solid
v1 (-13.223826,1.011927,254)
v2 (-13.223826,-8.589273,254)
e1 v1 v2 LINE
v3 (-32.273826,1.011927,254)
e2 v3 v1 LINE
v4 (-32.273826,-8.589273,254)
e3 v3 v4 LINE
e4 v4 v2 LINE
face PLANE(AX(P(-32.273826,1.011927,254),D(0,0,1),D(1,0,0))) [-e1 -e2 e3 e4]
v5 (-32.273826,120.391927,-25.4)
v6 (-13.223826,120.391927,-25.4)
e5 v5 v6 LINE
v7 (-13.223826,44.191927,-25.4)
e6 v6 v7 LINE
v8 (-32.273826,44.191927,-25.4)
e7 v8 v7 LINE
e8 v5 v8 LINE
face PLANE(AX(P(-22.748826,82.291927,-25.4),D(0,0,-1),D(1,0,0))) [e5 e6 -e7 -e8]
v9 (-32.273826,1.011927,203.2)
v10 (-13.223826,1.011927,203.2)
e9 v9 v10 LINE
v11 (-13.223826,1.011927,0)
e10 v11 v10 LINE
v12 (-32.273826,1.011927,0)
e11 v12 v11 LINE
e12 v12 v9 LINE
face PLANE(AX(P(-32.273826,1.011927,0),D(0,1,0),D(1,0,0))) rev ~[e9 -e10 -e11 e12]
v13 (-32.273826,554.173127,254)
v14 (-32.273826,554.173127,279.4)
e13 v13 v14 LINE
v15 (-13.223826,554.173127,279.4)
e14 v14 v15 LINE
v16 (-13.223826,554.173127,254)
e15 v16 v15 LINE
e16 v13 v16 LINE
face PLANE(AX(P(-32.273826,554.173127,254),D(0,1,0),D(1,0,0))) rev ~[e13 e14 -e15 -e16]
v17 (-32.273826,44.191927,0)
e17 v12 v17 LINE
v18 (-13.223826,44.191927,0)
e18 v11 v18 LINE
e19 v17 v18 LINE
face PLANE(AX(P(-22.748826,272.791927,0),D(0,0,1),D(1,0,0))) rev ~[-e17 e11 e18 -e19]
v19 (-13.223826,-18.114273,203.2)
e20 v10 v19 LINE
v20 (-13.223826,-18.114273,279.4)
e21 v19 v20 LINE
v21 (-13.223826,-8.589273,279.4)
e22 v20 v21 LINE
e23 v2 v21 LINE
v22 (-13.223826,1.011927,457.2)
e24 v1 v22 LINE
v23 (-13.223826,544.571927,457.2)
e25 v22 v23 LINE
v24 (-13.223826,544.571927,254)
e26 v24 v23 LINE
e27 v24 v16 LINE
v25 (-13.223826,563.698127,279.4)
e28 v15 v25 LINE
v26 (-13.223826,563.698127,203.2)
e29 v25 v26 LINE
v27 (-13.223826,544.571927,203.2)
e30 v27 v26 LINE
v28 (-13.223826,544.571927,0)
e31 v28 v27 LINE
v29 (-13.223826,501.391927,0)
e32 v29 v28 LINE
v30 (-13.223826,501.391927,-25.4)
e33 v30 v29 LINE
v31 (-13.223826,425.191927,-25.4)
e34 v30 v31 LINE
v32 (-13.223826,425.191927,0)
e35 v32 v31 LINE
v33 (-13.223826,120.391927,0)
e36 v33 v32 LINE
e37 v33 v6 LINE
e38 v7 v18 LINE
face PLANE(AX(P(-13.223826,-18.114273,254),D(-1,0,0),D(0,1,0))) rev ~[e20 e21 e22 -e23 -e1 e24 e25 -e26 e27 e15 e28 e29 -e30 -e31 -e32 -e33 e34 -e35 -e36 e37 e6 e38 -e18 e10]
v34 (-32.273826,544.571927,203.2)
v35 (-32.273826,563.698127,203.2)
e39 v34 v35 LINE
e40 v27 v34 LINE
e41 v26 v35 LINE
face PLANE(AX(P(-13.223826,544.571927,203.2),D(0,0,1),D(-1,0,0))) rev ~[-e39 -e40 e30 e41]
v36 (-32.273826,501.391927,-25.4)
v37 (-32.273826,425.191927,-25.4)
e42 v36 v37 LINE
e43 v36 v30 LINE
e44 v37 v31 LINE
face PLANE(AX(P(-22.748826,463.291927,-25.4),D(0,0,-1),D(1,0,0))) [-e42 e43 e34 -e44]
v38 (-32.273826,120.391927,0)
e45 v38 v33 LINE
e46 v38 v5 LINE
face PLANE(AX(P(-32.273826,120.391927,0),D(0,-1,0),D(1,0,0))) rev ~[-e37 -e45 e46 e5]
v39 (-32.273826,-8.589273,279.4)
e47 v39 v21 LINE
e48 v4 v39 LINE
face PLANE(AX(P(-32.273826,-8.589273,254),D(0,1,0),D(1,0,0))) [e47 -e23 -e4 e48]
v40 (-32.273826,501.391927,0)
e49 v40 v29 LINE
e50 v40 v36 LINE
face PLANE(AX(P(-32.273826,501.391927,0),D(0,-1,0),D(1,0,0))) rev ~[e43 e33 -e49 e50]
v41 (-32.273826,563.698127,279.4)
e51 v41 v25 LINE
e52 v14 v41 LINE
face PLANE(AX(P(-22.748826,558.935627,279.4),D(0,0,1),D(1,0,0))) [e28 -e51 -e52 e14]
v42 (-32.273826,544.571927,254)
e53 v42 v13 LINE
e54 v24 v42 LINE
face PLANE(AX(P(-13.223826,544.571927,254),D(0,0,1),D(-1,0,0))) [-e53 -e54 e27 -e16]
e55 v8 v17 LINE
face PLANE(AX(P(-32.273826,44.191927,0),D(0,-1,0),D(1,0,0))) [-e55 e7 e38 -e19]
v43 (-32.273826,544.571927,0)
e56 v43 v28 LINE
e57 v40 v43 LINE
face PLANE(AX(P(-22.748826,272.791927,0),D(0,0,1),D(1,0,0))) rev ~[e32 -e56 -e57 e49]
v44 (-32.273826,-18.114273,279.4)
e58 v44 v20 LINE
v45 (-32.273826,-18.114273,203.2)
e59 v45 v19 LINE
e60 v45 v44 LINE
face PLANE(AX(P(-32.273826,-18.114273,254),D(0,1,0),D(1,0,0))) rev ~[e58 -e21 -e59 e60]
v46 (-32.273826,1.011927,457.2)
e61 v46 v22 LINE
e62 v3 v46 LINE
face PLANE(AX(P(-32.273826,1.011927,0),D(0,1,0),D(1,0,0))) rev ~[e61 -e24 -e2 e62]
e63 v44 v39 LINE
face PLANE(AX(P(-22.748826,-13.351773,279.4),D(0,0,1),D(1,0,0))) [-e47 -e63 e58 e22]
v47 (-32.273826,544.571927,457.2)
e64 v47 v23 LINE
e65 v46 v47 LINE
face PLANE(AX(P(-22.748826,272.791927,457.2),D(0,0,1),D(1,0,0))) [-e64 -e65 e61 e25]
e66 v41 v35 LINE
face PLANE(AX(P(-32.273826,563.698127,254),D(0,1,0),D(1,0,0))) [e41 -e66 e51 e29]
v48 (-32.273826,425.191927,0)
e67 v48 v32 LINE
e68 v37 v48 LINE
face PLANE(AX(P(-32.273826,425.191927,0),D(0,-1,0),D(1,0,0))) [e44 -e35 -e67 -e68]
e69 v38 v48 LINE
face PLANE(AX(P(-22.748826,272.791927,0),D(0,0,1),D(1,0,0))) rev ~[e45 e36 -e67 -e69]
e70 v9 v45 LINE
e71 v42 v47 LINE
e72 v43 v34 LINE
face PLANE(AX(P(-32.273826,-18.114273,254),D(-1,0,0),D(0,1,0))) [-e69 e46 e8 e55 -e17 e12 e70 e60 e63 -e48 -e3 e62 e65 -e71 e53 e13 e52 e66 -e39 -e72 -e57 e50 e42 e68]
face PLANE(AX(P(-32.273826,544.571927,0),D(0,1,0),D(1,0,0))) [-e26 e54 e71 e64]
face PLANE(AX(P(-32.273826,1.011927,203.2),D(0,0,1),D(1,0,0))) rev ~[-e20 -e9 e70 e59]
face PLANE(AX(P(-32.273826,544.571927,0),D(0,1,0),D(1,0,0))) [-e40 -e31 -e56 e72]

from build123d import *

# Parameters (mm, degrees)
F0_W      = 19.05
F0_H      = 543.56
F1_DEPTH  = 457.2
F2_W      = 19.05
F2_H      = 50.8
F3_DEPTH  = 19.1262
F4_W      = 19.05
F4_H      = 9.525
F5_DEPTH  = 25.4
F6_W      = 19.05
F6_H      = 50.8
F7_DEPTH  = 19.1262
F8_W      = 19.05
F8_H      = 9.525
F9_DEPTH  = 25.4
F10_W     = 19.05
F10_H     = 76.2
F11_DEPTH = 9.652
F12_DEPTH = 25.4


# Not quite as in the source:
# - a feature names something its author has since deleted; it is built from what else it names


with BuildPart() as f1:
    # F0 (on Top) → F1 (new body)
    with BuildSketch(Plane.XY):
        with Locations((-22.7488256648, 272.7919273724)):
            Rectangle(F0_W, F0_H)
    extrude(amount=F1_DEPTH)

    # F2 (on face) → F3 (join)
    with BuildSketch(Plane(origin=(0, 544.5719273724, 0), x_dir=(-1, 0, 0), z_dir=(0, 1, 0))):
        with Locations((22.7488256648, 228.6)):
            Rectangle(F2_W, F2_H)
    extrude(amount=F3_DEPTH)

    # F4 (on face) → F5 (join)
    with BuildSketch(Plane.XY.offset(254)):
        with Locations((-22.7488256648, 558.9356273724)):
            Rectangle(F4_W, F4_H)
    extrude(amount=F5_DEPTH)

    # F6 (on face) → F7 (join)
    with BuildSketch(Plane.XZ.offset(-1.0119273724)):
        with Locations((-22.7488256648, 228.6)):
            Rectangle(F6_W, F6_H)
    extrude(amount=F7_DEPTH)

    # F8 (on face) → F9 (join)
    with BuildSketch(Plane.XY.offset(254)):
        with Locations((-22.7488256648, -13.3517726276)):
            Rectangle(F8_W, F8_H)
    extrude(amount=F9_DEPTH)

    # F10 (on face) → F11 (join)
    with BuildSketch(Plane(origin=(0, 0, 0), x_dir=(1, 0, 0), z_dir=(0, 0, -1))):
        with Locations((-22.7488256648, -82.2919273724)):
            Rectangle(F10_W, F10_H)
        with Locations((-22.7488256648, -463.2919273724)):
            Rectangle(F10_W, F10_H)
    extrude(amount=F11_DEPTH)

    # F10 (on face) → F12 (join)
    with BuildSketch(Plane(origin=(0, 0, 0), x_dir=(1, 0, 0), z_dir=(0, 0, -1))):
        with Locations((-22.7488256648, -82.2919273724)):
            Rectangle(F10_W, F10_H)
        with Locations((-22.7488256648, -463.2919273724)):
            Rectangle(F10_W, F10_H)
    extrude(amount=F12_DEPTH)


solid = f1.part
